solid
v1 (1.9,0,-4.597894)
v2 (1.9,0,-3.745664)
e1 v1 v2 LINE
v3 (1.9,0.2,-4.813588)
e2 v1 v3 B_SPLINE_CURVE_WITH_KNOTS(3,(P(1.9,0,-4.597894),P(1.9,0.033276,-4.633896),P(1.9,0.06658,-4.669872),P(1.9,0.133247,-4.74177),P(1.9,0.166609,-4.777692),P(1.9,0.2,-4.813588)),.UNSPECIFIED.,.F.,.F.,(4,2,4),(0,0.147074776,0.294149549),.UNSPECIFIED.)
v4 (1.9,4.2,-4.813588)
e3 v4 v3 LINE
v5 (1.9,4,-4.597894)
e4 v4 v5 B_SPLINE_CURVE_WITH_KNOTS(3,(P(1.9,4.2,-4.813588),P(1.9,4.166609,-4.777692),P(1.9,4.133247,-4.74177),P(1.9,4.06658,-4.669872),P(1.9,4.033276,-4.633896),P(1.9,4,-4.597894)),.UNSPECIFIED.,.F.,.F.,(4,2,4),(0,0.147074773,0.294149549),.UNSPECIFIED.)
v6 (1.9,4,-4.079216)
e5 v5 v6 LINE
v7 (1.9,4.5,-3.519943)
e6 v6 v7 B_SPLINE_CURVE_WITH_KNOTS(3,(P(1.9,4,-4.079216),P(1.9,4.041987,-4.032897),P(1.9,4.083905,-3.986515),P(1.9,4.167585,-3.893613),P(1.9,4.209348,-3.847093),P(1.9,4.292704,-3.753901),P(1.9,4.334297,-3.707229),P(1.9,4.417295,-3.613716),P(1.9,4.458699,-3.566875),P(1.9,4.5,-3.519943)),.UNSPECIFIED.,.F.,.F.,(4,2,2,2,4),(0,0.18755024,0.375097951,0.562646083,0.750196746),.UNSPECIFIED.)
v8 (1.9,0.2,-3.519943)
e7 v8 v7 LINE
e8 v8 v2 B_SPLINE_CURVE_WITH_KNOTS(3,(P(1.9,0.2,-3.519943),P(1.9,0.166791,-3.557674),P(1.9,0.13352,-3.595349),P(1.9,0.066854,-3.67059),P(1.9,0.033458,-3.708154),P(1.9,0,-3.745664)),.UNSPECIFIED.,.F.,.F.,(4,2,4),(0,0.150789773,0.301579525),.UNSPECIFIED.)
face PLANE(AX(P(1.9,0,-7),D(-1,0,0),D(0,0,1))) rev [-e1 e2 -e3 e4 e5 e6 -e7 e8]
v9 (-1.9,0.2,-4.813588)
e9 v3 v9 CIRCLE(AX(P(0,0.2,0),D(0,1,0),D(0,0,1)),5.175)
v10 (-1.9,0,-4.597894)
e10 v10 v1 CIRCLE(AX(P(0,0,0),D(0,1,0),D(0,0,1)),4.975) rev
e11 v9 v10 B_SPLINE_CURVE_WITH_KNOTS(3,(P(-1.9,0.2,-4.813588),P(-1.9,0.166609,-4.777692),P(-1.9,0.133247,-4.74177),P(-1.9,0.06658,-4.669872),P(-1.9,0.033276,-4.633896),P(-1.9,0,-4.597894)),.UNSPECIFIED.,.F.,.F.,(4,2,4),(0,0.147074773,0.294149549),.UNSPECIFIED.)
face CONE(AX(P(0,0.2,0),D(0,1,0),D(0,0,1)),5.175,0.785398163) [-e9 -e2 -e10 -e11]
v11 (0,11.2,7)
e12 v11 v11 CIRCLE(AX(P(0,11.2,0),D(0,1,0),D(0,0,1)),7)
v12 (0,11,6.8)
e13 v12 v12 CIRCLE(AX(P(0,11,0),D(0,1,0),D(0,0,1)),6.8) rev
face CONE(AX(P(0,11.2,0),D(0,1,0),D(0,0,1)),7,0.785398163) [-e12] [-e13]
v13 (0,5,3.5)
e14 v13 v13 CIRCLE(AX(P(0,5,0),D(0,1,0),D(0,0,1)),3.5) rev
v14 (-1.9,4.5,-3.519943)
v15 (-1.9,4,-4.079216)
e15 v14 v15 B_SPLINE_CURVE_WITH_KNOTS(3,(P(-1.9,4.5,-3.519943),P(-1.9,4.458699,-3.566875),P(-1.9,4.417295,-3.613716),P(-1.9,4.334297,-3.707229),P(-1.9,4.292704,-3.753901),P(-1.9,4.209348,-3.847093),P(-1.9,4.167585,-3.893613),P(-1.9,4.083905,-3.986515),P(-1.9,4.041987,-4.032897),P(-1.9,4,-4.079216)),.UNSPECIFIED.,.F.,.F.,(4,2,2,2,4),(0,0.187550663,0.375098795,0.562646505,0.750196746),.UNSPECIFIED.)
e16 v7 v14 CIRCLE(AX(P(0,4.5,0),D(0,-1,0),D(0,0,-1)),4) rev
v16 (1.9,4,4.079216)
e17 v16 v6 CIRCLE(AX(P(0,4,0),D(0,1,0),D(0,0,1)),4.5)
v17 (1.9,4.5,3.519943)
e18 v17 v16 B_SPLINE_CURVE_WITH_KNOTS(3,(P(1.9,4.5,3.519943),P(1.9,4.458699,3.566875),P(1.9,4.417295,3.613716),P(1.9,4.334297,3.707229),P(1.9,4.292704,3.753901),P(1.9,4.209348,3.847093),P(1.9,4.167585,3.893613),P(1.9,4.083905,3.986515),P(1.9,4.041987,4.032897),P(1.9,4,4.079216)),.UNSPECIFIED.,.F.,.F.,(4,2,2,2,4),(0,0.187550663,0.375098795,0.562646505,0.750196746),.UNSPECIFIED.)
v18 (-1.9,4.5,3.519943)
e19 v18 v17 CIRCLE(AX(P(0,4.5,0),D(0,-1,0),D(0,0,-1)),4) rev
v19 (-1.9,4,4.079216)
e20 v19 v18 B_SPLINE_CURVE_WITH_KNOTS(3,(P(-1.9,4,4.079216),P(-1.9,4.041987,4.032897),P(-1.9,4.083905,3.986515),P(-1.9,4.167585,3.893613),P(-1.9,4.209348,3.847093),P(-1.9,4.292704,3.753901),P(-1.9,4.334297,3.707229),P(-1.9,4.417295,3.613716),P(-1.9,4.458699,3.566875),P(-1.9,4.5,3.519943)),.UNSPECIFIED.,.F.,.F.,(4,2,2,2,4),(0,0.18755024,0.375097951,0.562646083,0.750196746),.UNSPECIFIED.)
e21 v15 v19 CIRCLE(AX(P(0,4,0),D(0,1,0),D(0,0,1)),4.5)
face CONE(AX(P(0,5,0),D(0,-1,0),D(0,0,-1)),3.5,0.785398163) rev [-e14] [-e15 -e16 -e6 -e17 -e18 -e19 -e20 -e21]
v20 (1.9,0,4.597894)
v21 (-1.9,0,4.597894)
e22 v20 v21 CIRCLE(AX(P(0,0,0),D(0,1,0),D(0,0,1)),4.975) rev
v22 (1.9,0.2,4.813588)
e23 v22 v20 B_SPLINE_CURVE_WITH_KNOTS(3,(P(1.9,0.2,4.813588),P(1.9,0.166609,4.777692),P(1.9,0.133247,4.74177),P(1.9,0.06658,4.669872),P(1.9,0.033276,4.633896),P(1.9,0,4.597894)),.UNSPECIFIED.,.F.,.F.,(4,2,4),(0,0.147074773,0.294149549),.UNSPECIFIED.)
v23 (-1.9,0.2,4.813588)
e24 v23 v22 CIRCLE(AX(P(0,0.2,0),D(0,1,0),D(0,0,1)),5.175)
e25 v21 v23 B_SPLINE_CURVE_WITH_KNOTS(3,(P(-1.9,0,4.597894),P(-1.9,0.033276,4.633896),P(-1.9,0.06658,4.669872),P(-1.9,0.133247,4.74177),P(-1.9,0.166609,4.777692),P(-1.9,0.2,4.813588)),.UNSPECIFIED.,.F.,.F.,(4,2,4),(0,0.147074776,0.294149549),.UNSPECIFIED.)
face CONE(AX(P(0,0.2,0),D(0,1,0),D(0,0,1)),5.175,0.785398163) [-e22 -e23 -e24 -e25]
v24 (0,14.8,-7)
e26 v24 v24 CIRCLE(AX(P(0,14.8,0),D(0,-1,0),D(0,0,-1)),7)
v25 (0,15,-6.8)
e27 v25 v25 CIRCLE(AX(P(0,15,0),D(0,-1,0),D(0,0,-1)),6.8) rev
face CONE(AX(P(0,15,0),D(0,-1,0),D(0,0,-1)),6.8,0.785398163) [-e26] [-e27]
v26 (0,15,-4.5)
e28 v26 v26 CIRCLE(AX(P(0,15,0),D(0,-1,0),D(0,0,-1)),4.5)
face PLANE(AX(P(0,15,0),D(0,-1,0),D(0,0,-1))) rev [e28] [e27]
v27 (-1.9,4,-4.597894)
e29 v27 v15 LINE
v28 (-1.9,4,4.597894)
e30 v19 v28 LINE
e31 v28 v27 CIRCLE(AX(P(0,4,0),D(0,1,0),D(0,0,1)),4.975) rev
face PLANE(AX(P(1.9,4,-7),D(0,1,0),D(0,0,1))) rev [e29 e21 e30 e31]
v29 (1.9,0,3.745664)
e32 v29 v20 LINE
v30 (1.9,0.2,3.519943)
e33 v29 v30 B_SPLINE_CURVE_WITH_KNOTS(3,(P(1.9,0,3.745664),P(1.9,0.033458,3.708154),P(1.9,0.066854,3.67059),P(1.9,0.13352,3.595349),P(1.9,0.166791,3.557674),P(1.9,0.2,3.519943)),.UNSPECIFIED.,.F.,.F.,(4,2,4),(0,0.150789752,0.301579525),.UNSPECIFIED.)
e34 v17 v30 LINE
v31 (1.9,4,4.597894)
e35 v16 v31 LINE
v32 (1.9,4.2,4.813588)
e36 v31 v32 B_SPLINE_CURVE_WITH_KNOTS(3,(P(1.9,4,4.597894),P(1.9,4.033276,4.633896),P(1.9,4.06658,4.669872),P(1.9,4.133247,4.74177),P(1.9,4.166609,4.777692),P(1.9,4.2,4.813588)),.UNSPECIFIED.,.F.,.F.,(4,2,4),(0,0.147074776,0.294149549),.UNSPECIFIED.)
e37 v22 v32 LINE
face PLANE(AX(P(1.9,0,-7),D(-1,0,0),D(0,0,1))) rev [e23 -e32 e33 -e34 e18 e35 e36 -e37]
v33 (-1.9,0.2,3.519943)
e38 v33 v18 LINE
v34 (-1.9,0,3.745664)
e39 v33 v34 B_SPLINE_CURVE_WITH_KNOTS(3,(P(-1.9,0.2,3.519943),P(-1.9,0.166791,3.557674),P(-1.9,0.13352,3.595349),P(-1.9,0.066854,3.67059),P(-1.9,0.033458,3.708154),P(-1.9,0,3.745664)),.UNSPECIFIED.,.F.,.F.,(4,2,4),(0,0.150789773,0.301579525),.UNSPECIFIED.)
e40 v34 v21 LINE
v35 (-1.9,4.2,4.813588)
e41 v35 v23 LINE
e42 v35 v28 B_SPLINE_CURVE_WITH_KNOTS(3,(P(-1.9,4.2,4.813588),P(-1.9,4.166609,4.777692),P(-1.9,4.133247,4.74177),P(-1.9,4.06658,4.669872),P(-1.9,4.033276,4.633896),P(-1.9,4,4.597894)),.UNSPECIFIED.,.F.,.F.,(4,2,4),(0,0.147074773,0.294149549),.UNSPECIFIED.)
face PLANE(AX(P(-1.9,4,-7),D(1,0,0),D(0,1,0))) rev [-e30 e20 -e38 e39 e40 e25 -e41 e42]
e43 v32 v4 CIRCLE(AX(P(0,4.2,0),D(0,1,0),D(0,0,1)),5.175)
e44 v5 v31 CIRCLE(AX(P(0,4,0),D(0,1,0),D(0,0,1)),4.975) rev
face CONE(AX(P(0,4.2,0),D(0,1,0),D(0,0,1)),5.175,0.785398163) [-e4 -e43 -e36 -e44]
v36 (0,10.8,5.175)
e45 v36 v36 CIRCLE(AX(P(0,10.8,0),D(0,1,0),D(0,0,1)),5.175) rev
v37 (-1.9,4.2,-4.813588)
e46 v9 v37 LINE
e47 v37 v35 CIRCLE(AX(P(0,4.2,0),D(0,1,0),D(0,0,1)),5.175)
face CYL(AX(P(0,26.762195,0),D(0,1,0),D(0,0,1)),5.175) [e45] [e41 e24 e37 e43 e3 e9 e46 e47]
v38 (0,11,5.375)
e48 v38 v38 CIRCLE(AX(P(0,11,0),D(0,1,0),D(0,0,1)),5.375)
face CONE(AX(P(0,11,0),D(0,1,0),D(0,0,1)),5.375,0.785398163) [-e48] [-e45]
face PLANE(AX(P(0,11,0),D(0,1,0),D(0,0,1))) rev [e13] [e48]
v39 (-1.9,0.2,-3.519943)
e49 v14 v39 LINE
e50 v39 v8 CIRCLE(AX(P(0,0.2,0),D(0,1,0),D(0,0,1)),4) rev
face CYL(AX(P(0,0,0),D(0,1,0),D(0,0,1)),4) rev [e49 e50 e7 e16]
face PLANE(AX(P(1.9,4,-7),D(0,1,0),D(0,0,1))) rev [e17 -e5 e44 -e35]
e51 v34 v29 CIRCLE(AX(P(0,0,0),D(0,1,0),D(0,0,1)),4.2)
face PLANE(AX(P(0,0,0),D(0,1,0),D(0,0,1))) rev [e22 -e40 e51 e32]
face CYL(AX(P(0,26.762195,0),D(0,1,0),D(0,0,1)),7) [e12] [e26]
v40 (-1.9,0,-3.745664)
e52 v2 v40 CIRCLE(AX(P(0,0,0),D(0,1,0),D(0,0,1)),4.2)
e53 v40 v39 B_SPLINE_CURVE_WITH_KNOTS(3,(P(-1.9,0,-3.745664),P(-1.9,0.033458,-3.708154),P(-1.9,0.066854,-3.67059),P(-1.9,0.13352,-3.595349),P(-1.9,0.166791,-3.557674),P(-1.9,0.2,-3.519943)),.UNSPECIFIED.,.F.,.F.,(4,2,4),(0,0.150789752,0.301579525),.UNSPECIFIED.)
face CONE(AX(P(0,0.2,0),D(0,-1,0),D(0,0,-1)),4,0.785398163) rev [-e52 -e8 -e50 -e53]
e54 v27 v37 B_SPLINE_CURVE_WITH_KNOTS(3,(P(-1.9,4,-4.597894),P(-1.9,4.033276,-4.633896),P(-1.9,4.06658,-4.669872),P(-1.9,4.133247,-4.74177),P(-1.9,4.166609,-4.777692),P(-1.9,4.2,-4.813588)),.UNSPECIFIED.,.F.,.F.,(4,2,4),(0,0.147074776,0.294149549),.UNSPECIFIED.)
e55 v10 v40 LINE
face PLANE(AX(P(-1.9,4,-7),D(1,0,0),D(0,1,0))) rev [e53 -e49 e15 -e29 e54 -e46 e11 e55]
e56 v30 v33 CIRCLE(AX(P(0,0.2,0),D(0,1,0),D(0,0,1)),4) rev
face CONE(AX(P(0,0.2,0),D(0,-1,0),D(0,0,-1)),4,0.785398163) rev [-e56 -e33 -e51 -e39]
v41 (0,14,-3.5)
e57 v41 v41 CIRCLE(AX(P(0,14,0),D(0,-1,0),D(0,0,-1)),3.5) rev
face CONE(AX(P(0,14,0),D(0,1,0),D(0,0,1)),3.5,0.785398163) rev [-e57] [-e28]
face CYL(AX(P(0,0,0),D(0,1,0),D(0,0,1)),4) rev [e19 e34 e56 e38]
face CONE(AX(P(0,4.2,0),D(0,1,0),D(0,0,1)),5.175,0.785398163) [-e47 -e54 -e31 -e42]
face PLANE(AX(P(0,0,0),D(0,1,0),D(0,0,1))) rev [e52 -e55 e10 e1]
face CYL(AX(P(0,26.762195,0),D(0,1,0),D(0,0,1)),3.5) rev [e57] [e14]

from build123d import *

# Parameters (mm, degrees)
CUT_EXTRUDE_1_DEPTH      = 18.972200756
CUT_EXTRUDE_1_DEPTH_BACK = 18.972200756
SKETCH_2_W               = 3.275
SKETCH_2_H               = 4
SKETCH_3_R               = 4
CUT_EXTRUDE_2_DEPTH      = 4
CHAMFER_1_SIZE           = 1
CHAMFER_2_SIZE           = 0.2


with BuildPart() as part:
    # Эскиз1 → Повернуть1 (revolve)
    with BuildSketch(Plane(origin=(0, 0, 0), x_dir=(0, 0, -1), z_dir=(1, 0, 0)), mode=Mode.PRIVATE) as revolve_1_sk:
        Polygon((3.5, 15), (3.5, 0), (5.175, 0), (5.175, 11), (7, 11), (7, 15), align=None)
    revolve(revolve_1_sk.sketch.rotate(Axis((0, 26.762195122, 0), (0, -1, 0)), 180), axis=Axis((0, 26.762195122, 0), (0, -1, 0)))

    # Эскиз2 → Вырез-Вытянуть1 (cut, two sides: drawn at the far end of the back side and taken through both)
    with BuildSketch(Plane.XY.offset(-CUT_EXTRUDE_1_DEPTH_BACK)):
        with Locations((3.5375, 2)):
            Rectangle(SKETCH_2_W, SKETCH_2_H)
        with Locations((-3.5375, 2)):
            Rectangle(SKETCH_2_W, SKETCH_2_H)
    extrude(amount=CUT_EXTRUDE_1_DEPTH + CUT_EXTRUDE_1_DEPTH_BACK, mode=Mode.SUBTRACT)

    # Эскиз3 → Вырез-Вытянуть2 (cut)
    with BuildSketch(Plane.XZ.offset(-4)):
        Circle(SKETCH_3_R)
    extrude(amount=CUT_EXTRUDE_2_DEPTH, mode=Mode.SUBTRACT)

    # Фаска1
    # the kernel refuses this chamfer: 1 mm, written as the material it takes off along each edge
    with BuildSketch(Plane(origin=(0, 4, 0), x_dir=(0, 0, 1), z_dir=(1, 0, 0))) as chamfer_1_piece_1_section:
        Polygon((3.5, -CHAMFER_1_SIZE), (3.5 + CHAMFER_1_SIZE, 0), (3.5, 0), align=None)
    chamfer_1_piece_1 = revolve(axis=Axis((0, 4, 0), (0, -1, 0)), mode=Mode.PRIVATE)
    chamfer_1_piece_1 = chamfer_1_piece_1 & Plane(origin=(0, 4.334033243, 0), x_dir=(1, 0, 0), z_dir=(0, 1, 0)) * Cylinder(4, 19, mode=Mode.PRIVATE)
    add(chamfer_1_piece_1, mode=Mode.SUBTRACT)
    with BuildSketch(Plane(origin=(0, 4, 0), x_dir=(0, 0, 1), z_dir=(1, 0, 0))) as chamfer_1_piece_2_section:
        Polygon((3.5, -CHAMFER_1_SIZE), (3.5 + CHAMFER_1_SIZE, 0), (3.5, 0), align=None)
    chamfer_1_piece_2 = revolve(axis=Axis((0, 4, 0), (0, -1, 0)), mode=Mode.PRIVATE)
    chamfer_1_piece_2 = split(chamfer_1_piece_2, bisect_by=Plane(origin=(-1.9, 4.24260685, 0), z_dir=(-1, 0, 0)), keep=Keep.TOP, mode=Mode.PRIVATE)
    add(chamfer_1_piece_2, mode=Mode.SUBTRACT)
    with BuildSketch(Plane(origin=(0, 4, 0), x_dir=(0, 0, 1), z_dir=(1, 0, 0))) as chamfer_1_piece_3_section:
        Polygon((3.5, -CHAMFER_1_SIZE), (3.5 + CHAMFER_1_SIZE, 0), (3.5, 0), align=None)
    chamfer_1_piece_3 = revolve(axis=Axis((0, 4, 0), (0, -1, 0)), mode=Mode.PRIVATE)
    chamfer_1_piece_3 = split(chamfer_1_piece_3, bisect_by=Plane(origin=(1.9, 4.24260685, 0), z_dir=(1, 0, 0)), keep=Keep.TOP, mode=Mode.PRIVATE)
    add(chamfer_1_piece_3, mode=Mode.SUBTRACT)
    with BuildSketch(Plane(origin=(0, 15, 0), x_dir=(0, 0, 1), z_dir=(1, 0, 0))) as chamfer_1_piece_4:
        Polygon((3.5, CHAMFER_1_SIZE), (3.5 + CHAMFER_1_SIZE, 0), (3.5, 0), align=None)
    revolve(axis=Axis((0, 15, 0), (0, -1, 0)), mode=Mode.SUBTRACT)

    # Фаска2
    chamfer_2_edges = [part.edges().sort_by_distance(p)[0] for p in [
        (0, 0, -5.175),
        (5.175, 4, 0),
        (0.967033992, 0, 5.083844043),
        (-5.175, 4, 0),
        (0, 15, -7),
        (0, 11, -7),
        (0, 11, -5.175),
        (0, 0, -4),
        (0, 0, 4),
    ]]
    chamfer(chamfer_2_edges, length=CHAMFER_2_SIZE)


solid = part.part
